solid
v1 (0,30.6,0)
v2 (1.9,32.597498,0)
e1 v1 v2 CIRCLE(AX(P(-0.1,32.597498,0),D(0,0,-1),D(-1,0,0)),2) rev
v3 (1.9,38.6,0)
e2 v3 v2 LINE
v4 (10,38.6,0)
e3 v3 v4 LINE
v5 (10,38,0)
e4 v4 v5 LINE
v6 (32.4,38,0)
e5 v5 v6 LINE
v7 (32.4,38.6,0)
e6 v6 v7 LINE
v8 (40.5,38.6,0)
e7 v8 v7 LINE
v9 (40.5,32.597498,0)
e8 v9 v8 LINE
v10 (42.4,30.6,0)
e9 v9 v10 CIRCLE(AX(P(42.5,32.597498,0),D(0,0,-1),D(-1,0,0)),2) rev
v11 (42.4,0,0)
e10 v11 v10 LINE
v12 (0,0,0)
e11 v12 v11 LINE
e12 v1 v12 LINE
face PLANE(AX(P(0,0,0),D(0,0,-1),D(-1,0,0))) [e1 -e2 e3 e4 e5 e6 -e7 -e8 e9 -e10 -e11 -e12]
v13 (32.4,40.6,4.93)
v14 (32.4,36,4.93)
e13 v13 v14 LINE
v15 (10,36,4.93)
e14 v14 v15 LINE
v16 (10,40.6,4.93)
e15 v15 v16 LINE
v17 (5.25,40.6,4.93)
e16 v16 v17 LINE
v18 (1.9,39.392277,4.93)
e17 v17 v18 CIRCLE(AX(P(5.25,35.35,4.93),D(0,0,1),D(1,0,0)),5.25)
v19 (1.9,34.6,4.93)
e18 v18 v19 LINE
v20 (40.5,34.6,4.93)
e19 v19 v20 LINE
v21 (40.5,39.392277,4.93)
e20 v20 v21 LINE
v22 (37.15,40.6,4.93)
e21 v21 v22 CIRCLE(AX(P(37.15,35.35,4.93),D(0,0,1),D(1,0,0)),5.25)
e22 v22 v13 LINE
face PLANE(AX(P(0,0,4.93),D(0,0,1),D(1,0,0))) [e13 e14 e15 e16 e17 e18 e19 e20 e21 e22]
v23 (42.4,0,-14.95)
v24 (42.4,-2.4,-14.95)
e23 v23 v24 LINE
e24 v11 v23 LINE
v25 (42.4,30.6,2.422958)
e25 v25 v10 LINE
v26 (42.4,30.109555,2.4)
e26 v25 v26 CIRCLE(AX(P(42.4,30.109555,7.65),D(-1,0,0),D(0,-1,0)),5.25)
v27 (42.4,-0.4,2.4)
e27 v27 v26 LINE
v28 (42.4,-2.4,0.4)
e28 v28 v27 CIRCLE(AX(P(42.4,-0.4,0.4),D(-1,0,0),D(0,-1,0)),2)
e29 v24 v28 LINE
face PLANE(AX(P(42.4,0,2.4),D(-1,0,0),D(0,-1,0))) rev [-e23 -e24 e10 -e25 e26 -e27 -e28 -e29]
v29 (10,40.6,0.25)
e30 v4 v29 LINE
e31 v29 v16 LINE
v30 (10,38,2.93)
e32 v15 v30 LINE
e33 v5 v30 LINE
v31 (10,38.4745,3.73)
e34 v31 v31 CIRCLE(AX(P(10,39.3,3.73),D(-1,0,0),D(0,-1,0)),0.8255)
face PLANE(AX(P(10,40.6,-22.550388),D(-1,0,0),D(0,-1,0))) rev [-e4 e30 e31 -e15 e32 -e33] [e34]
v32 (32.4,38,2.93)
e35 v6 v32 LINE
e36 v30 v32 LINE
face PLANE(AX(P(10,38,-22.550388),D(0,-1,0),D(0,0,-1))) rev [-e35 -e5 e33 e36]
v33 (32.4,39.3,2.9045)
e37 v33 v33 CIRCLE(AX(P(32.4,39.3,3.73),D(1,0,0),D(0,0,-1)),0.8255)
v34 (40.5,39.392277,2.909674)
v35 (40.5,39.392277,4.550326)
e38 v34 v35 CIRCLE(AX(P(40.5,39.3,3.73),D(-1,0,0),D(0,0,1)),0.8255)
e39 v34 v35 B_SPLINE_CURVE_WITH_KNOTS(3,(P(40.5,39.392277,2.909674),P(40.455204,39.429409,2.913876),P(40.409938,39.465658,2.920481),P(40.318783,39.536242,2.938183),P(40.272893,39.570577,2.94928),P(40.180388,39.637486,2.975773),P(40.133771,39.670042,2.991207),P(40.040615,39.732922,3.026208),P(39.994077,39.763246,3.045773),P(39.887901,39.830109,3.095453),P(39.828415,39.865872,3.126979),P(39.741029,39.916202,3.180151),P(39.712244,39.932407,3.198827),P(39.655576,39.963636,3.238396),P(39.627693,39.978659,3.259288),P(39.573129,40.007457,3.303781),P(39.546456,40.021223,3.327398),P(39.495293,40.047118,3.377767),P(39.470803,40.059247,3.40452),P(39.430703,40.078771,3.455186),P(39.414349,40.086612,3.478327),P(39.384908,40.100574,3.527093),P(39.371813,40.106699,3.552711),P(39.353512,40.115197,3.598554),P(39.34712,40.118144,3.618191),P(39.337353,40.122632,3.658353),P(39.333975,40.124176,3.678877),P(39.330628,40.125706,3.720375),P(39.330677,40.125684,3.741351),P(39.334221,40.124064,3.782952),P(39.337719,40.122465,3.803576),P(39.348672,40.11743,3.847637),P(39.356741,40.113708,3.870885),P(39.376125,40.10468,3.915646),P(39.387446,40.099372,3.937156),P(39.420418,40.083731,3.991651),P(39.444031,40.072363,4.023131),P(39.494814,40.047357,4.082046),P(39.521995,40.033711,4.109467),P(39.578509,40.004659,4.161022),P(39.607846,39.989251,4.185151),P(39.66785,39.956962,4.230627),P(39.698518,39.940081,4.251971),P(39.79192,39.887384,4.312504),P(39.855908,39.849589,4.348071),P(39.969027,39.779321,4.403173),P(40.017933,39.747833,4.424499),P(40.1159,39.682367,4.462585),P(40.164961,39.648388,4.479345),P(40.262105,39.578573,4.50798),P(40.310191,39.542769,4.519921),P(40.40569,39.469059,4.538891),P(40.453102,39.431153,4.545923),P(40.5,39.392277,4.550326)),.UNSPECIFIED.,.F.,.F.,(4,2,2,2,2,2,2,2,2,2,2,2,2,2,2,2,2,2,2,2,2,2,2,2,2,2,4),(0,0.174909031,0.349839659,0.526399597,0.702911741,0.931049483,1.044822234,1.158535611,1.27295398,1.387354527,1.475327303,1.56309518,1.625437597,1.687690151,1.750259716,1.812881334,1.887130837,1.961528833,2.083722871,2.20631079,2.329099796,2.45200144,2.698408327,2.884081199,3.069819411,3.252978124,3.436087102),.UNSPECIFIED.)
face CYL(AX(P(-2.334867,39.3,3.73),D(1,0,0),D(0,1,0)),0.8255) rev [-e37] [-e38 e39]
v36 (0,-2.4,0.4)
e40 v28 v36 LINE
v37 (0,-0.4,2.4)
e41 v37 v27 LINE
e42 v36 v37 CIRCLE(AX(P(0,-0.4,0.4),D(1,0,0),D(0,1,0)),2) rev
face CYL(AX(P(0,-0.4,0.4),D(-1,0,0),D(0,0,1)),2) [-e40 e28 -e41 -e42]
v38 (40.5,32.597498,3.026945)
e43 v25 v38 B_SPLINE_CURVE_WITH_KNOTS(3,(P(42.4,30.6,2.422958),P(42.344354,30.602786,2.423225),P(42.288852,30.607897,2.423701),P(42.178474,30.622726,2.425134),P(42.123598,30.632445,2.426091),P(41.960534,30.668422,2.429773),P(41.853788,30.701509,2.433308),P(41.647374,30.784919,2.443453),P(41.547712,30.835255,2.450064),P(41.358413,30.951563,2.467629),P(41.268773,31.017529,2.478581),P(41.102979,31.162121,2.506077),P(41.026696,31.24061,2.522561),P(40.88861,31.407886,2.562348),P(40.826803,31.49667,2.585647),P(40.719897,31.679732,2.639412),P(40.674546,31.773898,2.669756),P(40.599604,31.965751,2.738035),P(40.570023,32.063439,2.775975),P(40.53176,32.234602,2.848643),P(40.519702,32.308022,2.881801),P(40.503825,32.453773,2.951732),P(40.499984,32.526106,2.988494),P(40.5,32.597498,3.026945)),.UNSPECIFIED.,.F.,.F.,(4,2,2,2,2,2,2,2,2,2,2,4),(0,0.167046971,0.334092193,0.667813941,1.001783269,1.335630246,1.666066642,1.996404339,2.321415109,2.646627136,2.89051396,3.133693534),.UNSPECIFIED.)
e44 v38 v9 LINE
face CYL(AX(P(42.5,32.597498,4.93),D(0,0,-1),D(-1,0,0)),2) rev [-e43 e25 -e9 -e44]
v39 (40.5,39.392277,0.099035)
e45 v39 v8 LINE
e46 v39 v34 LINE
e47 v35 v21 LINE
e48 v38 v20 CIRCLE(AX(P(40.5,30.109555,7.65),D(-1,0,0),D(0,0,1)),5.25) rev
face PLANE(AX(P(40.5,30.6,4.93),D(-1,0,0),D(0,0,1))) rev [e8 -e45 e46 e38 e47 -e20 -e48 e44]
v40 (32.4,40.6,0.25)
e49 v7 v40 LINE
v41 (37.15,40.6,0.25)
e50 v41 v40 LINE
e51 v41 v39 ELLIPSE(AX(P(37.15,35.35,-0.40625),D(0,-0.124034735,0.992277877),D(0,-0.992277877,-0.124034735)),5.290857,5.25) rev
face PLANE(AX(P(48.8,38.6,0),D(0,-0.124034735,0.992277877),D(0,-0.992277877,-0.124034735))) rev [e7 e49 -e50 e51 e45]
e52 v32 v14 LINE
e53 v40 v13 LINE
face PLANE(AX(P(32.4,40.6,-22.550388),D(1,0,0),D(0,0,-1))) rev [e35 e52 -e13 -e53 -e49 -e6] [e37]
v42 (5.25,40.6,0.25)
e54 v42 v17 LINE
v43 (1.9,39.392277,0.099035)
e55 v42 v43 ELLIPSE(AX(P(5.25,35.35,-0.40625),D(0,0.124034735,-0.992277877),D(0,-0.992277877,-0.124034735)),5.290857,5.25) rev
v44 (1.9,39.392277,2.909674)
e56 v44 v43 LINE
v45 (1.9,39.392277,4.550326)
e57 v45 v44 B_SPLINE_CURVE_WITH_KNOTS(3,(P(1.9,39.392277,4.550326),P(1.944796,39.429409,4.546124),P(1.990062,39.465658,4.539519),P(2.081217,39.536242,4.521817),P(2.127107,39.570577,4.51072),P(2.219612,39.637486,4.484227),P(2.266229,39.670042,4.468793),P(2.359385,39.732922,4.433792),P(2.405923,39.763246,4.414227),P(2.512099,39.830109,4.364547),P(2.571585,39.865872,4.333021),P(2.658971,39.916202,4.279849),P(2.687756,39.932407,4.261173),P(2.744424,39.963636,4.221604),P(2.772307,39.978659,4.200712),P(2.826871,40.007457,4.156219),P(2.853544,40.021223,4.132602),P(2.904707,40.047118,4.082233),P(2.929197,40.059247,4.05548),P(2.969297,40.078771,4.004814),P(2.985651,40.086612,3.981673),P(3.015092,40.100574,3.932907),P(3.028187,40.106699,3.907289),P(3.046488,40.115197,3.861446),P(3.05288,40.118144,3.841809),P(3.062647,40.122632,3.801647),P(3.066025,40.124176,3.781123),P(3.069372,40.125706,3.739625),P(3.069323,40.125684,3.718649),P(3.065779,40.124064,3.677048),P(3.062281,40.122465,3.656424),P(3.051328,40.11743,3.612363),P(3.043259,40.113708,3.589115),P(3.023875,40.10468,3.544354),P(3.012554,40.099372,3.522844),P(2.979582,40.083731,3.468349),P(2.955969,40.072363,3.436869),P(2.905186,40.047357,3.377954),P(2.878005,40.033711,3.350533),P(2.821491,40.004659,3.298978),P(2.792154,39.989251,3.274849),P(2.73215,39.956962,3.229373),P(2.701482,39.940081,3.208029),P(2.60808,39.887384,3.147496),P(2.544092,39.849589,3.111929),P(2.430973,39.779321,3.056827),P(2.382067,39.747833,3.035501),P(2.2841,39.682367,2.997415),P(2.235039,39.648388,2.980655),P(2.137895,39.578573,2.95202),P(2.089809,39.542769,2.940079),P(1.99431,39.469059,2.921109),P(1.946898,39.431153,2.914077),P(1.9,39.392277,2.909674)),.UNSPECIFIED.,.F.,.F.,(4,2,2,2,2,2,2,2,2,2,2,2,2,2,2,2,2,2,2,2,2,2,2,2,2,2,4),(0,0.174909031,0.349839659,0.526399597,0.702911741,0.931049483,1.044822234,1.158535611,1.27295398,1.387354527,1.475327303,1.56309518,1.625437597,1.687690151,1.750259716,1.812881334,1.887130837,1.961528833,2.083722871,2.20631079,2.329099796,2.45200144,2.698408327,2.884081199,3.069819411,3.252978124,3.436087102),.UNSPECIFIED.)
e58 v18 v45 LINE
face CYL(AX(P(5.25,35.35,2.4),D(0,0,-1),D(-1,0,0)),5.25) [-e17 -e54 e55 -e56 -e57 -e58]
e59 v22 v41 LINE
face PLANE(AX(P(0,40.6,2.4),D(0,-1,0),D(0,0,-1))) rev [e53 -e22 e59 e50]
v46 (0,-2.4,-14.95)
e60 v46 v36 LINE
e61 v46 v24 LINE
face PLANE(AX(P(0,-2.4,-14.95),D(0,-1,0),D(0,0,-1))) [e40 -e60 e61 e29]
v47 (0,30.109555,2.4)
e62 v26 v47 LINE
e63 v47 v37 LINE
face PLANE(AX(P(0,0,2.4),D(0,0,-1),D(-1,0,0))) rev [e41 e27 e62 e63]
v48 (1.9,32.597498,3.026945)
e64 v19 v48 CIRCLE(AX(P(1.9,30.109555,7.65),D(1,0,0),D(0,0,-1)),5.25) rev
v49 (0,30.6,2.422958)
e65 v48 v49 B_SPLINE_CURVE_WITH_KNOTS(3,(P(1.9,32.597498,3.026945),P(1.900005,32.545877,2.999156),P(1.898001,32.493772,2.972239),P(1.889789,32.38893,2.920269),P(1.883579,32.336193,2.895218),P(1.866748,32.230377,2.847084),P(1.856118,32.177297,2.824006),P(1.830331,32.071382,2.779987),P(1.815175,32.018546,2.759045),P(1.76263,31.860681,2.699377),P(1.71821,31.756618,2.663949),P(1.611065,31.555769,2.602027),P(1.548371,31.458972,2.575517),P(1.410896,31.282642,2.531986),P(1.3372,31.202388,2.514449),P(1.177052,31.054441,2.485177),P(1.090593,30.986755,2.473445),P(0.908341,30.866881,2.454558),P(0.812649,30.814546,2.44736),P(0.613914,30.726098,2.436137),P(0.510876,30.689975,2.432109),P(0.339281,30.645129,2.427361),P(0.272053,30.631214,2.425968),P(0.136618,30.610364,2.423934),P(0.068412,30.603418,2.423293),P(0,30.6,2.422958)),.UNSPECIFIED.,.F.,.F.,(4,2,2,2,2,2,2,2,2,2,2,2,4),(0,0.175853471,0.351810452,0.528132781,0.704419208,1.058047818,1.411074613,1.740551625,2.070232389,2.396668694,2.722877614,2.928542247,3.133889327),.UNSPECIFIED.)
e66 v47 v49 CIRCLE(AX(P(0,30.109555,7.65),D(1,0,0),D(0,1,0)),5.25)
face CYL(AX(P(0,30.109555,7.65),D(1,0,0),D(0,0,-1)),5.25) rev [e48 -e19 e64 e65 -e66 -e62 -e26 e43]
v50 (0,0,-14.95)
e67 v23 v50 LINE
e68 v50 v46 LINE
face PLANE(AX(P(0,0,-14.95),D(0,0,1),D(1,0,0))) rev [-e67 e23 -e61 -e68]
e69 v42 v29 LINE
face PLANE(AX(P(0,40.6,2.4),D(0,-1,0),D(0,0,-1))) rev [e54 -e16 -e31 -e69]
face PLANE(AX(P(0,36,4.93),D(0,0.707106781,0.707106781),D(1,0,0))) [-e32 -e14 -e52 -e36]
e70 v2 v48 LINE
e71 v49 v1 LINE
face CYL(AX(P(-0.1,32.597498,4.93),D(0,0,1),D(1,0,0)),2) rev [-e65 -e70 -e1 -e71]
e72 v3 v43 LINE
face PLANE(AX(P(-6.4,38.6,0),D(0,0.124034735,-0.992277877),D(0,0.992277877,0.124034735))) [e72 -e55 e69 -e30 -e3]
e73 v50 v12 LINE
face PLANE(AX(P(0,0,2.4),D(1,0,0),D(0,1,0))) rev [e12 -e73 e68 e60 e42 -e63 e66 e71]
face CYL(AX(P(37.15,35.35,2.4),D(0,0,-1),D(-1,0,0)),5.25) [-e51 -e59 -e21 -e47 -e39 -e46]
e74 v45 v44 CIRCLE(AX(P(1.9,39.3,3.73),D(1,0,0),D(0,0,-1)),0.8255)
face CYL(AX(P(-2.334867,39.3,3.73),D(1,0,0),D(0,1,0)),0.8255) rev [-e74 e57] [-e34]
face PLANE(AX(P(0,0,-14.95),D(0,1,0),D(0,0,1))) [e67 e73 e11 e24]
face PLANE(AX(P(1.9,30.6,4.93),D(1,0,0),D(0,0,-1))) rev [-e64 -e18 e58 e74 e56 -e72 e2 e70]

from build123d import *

# Parameters (mm, degrees)
SKETCH1_W           = 42.4
SKETCH1_H           = 40.6
BOSS_EXTRUDE1_DEPTH = 2.4
SKETCH2_W           = 40
SKETCH2_H           = 2.4
BOSS_EXTRUDE2_DEPTH = 17.35
SKETCH3_W           = 22.4
SKETCH3_H           = 2.6
CUT_EXTRUDE1_DEPTH  = 2.4
BOSS_EXTRUDE3_DEPTH = 2.53
FILLET1_R           = 5.25
FILLET2_R           = 5.25
CUT_EXTRUDE2_DEPTH  = 16.4
FILLET3_R           = 2
CHAMFER1_SIZE       = 2
SKETCH9_W           = 1.9
SKETCH9_H           = 10
CUT_EXTRUDE4_DEPTH  = 61.577409156
FILLET5_R           = 2
BOSS_EXTRUDE4_DEPTH = 2.4
CUT_EXTRUDE5_START  = -8.1
SKETCH4_R           = 0.8255
CUT_EXTRUDE5_DEPTH  = 38.6


with BuildPart() as part:
    # Sketch1 → Boss-Extrude1 (new body)
    with BuildSketch(Plane.XY):
        with Locations((21.2, 20.3)):
            Rectangle(SKETCH1_W, SKETCH1_H)
    extrude(amount=BOSS_EXTRUDE1_DEPTH)

    # Sketch2 → Boss-Extrude2 (add)
    with BuildSketch(Plane.XY.offset(2.4)):
        with Locations((20, -1.2)):
            Rectangle(SKETCH2_W, SKETCH2_H)
    extrude(amount=-BOSS_EXTRUDE2_DEPTH)

    # Sketch3 → Cut-Extrude1 (cut)
    with BuildSketch(Plane.XY.offset(2.4)):
        with Locations((21.2, 39.3)):
            Rectangle(SKETCH3_W, SKETCH3_H)
    extrude(amount=-CUT_EXTRUDE1_DEPTH, mode=Mode.SUBTRACT)

    # Sketch5 → Boss-Extrude3 (add)
    with BuildSketch(Plane.XY.offset(2.4)):
        Polygon((0, 40.6), (0, 34.6), (42.4, 34.6), (42.4, 40.6), (32.4, 40.6), (32.4, 38), (10, 38), (10, 40.6), align=None)
    extrude(amount=BOSS_EXTRUDE3_DEPTH)

    # Fillet1
    fillet1_edges = [part.edges().sort_by_distance(p)[0] for p in [
        (0, 40.6, 2.465),
        (42.4, 40.6, 2.465),
    ]]
    fillet(fillet1_edges, radius=FILLET1_R)

    # Fillet2
    # the kernel refuses this fillet: 5.25 mm, written as the material it adds along each edge
    with BuildSketch(Plane(origin=(0, 34.6, 2.4), x_dir=(0, 0, 1), z_dir=(1, 0, 0))) as fillet2_piece_1:
        with BuildLine():
            CenterArc((5.25, 4.490445412), FILLET2_R, 180, 58.795429652)
            Line((0, 4.490445412), (-0.105, 4.490445412))
            Line((-0.105, 4.490445412), (-0.105, 0))
            Line((-0.105, 0), (0, -0.105))
            ThreePointArc((0, -0.105), (1.265, -0.105), (2.4756, -0.089808908))
            Line((2.4756, -0.089808908), (2.53, 0))
        make_face()
    extrude(amount=42.4)

    # Sketch6 → Cut-Extrude2 (cut)
    with BuildSketch(Plane.ZY.offset(-32.4)):
        Polygon((0, 40.6), (0, 38.6), (0.25, 40.6), align=None)
    cut_extrude2 = extrude(amount=-CUT_EXTRUDE2_DEPTH, mode=Mode.SUBTRACT)

    # Fillet3
    fillet3_edges = [part.edges().sort_by_distance(p)[0] for p in [
        (20, -2.4, 2.4),
    ]]
    fillet(fillet3_edges, radius=FILLET3_R)

    # Chamfer1
    chamfer1_edges = [part.edges().sort_by_distance(p)[0] for p in [
        (21.2, 38, 4.93),
    ]]
    chamfer(chamfer1_edges, length=CHAMFER1_SIZE)

    # Sketch9 → Cut-Extrude4 (cut, through all)
    with BuildSketch(Plane(origin=(0, 0, 0), x_dir=(-1, 0, 0), z_dir=(0, 0, -1))):
        with Locations((-41.45, 35.6)):
            Rectangle(SKETCH9_W, SKETCH9_H)
        with Locations((-0.95, 35.6)):
            Rectangle(SKETCH9_W, SKETCH9_H)
    extrude(amount=-CUT_EXTRUDE4_DEPTH, mode=Mode.SUBTRACT)

    # Fillet5
    # the kernel refuses this fillet: 2 mm, written as the material it adds along each edge
    with BuildSketch(Plane(origin=(1.9, 30.6, 0), x_dir=(0, 1, 0), z_dir=(0, 0, 1))) as fillet5_piece_1_section:
        with BuildLine():
            CenterArc((1.997498436, 2), FILLET5_R, 182.865983983, 87.134016017)
            Line((0, 1.9), (-0.039949969, 1.898))
            ThreePointArc((-0.039949969, 1.898), (-0.04, 0.95), (-0.04, 0))
            Line((-0.04, 0), (0, -0.04))
            Line((0, -0.04), (1.997498436, -0.04))
            Line((1.997498436, -0.04), (1.997498436, 0))
        make_face()
    fillet5_piece_1 = extrude(amount=7.416704545, mode=Mode.PRIVATE)
    fillet5_piece_1 = fillet5_piece_1 - Plane(origin=(1.464355644, 30.109554588, 7.65), x_dir=(0, 0, 1), z_dir=(-1, 0, 0)) * Cylinder(5.25, 23, mode=Mode.PRIVATE)
    add(fillet5_piece_1)
    with BuildSketch(Plane(origin=(40.5, 30.6, 0), x_dir=(0, 1, 0), z_dir=(0, 0, 1))) as fillet5_piece_2_section:
        with BuildLine():
            CenterArc((1.997498436, -2), FILLET5_R, 90, 87.134016017)
            Line((0, -1.9), (-0.039949969, -1.898))
            ThreePointArc((-0.039949969, -1.898), (-0.04, -0.95), (-0.04, 0))
            Line((-0.04, 0), (0, 0.04))
            Line((0, 0.04), (1.997498436, 0.04))
            Line((1.997498436, 0.04), (1.997498436, 0))
        make_face()
    fillet5_piece_2 = extrude(amount=7.416704545, mode=Mode.PRIVATE)
    fillet5_piece_2 = fillet5_piece_2 - Plane(origin=(40.935644356, 30.109554588, 7.65), x_dir=(0, 0, 1), z_dir=(-1, 0, 0)) * Cylinder(5.25, 23, mode=Mode.PRIVATE)
    add(fillet5_piece_2)

    # Sketch10 → Boss-Extrude4 (add)
    with BuildSketch(Plane(origin=(40, 0, 0), x_dir=(0, 0, -1), z_dir=(1, 0, 0))):
        with BuildLine():
            Line((-2.4, 0), (-2.4, -0.4))
            ThreePointArc((-2.4, -0.4), (-1.814213562, -1.814213562), (-0.4, -2.4))
            Line((-0.4, -2.4), (14.95, -2.4))
            Line((14.95, -2.4), (14.95, 0))
            Line((14.95, 0), (0, 0))
            Line((0, 0), (-2.4, 0))
        make_face()
    extrude(amount=BOSS_EXTRUDE4_DEPTH)

    # Mirror1: Cut-Extrude2 across plane
    add(cut_extrude2.mirror(Plane(origin=(21.2, 0, 0), x_dir=(0, 0, 1), z_dir=(1, 0, 0))), mode=Mode.SUBTRACT)

    # Sketch4 → Cut-Extrude5 (cut)
    with BuildSketch(Plane(origin=(10, 0, 0), x_dir=(0, 0, -1), z_dir=(1, 0, 0)).offset(CUT_EXTRUDE5_START)):
        with Locations(Location((-3.73, 39.3, 0), (0, 0, 173.581911643))):
            Circle(SKETCH4_R)
    extrude(amount=CUT_EXTRUDE5_DEPTH, mode=Mode.SUBTRACT)


solid = part.part
